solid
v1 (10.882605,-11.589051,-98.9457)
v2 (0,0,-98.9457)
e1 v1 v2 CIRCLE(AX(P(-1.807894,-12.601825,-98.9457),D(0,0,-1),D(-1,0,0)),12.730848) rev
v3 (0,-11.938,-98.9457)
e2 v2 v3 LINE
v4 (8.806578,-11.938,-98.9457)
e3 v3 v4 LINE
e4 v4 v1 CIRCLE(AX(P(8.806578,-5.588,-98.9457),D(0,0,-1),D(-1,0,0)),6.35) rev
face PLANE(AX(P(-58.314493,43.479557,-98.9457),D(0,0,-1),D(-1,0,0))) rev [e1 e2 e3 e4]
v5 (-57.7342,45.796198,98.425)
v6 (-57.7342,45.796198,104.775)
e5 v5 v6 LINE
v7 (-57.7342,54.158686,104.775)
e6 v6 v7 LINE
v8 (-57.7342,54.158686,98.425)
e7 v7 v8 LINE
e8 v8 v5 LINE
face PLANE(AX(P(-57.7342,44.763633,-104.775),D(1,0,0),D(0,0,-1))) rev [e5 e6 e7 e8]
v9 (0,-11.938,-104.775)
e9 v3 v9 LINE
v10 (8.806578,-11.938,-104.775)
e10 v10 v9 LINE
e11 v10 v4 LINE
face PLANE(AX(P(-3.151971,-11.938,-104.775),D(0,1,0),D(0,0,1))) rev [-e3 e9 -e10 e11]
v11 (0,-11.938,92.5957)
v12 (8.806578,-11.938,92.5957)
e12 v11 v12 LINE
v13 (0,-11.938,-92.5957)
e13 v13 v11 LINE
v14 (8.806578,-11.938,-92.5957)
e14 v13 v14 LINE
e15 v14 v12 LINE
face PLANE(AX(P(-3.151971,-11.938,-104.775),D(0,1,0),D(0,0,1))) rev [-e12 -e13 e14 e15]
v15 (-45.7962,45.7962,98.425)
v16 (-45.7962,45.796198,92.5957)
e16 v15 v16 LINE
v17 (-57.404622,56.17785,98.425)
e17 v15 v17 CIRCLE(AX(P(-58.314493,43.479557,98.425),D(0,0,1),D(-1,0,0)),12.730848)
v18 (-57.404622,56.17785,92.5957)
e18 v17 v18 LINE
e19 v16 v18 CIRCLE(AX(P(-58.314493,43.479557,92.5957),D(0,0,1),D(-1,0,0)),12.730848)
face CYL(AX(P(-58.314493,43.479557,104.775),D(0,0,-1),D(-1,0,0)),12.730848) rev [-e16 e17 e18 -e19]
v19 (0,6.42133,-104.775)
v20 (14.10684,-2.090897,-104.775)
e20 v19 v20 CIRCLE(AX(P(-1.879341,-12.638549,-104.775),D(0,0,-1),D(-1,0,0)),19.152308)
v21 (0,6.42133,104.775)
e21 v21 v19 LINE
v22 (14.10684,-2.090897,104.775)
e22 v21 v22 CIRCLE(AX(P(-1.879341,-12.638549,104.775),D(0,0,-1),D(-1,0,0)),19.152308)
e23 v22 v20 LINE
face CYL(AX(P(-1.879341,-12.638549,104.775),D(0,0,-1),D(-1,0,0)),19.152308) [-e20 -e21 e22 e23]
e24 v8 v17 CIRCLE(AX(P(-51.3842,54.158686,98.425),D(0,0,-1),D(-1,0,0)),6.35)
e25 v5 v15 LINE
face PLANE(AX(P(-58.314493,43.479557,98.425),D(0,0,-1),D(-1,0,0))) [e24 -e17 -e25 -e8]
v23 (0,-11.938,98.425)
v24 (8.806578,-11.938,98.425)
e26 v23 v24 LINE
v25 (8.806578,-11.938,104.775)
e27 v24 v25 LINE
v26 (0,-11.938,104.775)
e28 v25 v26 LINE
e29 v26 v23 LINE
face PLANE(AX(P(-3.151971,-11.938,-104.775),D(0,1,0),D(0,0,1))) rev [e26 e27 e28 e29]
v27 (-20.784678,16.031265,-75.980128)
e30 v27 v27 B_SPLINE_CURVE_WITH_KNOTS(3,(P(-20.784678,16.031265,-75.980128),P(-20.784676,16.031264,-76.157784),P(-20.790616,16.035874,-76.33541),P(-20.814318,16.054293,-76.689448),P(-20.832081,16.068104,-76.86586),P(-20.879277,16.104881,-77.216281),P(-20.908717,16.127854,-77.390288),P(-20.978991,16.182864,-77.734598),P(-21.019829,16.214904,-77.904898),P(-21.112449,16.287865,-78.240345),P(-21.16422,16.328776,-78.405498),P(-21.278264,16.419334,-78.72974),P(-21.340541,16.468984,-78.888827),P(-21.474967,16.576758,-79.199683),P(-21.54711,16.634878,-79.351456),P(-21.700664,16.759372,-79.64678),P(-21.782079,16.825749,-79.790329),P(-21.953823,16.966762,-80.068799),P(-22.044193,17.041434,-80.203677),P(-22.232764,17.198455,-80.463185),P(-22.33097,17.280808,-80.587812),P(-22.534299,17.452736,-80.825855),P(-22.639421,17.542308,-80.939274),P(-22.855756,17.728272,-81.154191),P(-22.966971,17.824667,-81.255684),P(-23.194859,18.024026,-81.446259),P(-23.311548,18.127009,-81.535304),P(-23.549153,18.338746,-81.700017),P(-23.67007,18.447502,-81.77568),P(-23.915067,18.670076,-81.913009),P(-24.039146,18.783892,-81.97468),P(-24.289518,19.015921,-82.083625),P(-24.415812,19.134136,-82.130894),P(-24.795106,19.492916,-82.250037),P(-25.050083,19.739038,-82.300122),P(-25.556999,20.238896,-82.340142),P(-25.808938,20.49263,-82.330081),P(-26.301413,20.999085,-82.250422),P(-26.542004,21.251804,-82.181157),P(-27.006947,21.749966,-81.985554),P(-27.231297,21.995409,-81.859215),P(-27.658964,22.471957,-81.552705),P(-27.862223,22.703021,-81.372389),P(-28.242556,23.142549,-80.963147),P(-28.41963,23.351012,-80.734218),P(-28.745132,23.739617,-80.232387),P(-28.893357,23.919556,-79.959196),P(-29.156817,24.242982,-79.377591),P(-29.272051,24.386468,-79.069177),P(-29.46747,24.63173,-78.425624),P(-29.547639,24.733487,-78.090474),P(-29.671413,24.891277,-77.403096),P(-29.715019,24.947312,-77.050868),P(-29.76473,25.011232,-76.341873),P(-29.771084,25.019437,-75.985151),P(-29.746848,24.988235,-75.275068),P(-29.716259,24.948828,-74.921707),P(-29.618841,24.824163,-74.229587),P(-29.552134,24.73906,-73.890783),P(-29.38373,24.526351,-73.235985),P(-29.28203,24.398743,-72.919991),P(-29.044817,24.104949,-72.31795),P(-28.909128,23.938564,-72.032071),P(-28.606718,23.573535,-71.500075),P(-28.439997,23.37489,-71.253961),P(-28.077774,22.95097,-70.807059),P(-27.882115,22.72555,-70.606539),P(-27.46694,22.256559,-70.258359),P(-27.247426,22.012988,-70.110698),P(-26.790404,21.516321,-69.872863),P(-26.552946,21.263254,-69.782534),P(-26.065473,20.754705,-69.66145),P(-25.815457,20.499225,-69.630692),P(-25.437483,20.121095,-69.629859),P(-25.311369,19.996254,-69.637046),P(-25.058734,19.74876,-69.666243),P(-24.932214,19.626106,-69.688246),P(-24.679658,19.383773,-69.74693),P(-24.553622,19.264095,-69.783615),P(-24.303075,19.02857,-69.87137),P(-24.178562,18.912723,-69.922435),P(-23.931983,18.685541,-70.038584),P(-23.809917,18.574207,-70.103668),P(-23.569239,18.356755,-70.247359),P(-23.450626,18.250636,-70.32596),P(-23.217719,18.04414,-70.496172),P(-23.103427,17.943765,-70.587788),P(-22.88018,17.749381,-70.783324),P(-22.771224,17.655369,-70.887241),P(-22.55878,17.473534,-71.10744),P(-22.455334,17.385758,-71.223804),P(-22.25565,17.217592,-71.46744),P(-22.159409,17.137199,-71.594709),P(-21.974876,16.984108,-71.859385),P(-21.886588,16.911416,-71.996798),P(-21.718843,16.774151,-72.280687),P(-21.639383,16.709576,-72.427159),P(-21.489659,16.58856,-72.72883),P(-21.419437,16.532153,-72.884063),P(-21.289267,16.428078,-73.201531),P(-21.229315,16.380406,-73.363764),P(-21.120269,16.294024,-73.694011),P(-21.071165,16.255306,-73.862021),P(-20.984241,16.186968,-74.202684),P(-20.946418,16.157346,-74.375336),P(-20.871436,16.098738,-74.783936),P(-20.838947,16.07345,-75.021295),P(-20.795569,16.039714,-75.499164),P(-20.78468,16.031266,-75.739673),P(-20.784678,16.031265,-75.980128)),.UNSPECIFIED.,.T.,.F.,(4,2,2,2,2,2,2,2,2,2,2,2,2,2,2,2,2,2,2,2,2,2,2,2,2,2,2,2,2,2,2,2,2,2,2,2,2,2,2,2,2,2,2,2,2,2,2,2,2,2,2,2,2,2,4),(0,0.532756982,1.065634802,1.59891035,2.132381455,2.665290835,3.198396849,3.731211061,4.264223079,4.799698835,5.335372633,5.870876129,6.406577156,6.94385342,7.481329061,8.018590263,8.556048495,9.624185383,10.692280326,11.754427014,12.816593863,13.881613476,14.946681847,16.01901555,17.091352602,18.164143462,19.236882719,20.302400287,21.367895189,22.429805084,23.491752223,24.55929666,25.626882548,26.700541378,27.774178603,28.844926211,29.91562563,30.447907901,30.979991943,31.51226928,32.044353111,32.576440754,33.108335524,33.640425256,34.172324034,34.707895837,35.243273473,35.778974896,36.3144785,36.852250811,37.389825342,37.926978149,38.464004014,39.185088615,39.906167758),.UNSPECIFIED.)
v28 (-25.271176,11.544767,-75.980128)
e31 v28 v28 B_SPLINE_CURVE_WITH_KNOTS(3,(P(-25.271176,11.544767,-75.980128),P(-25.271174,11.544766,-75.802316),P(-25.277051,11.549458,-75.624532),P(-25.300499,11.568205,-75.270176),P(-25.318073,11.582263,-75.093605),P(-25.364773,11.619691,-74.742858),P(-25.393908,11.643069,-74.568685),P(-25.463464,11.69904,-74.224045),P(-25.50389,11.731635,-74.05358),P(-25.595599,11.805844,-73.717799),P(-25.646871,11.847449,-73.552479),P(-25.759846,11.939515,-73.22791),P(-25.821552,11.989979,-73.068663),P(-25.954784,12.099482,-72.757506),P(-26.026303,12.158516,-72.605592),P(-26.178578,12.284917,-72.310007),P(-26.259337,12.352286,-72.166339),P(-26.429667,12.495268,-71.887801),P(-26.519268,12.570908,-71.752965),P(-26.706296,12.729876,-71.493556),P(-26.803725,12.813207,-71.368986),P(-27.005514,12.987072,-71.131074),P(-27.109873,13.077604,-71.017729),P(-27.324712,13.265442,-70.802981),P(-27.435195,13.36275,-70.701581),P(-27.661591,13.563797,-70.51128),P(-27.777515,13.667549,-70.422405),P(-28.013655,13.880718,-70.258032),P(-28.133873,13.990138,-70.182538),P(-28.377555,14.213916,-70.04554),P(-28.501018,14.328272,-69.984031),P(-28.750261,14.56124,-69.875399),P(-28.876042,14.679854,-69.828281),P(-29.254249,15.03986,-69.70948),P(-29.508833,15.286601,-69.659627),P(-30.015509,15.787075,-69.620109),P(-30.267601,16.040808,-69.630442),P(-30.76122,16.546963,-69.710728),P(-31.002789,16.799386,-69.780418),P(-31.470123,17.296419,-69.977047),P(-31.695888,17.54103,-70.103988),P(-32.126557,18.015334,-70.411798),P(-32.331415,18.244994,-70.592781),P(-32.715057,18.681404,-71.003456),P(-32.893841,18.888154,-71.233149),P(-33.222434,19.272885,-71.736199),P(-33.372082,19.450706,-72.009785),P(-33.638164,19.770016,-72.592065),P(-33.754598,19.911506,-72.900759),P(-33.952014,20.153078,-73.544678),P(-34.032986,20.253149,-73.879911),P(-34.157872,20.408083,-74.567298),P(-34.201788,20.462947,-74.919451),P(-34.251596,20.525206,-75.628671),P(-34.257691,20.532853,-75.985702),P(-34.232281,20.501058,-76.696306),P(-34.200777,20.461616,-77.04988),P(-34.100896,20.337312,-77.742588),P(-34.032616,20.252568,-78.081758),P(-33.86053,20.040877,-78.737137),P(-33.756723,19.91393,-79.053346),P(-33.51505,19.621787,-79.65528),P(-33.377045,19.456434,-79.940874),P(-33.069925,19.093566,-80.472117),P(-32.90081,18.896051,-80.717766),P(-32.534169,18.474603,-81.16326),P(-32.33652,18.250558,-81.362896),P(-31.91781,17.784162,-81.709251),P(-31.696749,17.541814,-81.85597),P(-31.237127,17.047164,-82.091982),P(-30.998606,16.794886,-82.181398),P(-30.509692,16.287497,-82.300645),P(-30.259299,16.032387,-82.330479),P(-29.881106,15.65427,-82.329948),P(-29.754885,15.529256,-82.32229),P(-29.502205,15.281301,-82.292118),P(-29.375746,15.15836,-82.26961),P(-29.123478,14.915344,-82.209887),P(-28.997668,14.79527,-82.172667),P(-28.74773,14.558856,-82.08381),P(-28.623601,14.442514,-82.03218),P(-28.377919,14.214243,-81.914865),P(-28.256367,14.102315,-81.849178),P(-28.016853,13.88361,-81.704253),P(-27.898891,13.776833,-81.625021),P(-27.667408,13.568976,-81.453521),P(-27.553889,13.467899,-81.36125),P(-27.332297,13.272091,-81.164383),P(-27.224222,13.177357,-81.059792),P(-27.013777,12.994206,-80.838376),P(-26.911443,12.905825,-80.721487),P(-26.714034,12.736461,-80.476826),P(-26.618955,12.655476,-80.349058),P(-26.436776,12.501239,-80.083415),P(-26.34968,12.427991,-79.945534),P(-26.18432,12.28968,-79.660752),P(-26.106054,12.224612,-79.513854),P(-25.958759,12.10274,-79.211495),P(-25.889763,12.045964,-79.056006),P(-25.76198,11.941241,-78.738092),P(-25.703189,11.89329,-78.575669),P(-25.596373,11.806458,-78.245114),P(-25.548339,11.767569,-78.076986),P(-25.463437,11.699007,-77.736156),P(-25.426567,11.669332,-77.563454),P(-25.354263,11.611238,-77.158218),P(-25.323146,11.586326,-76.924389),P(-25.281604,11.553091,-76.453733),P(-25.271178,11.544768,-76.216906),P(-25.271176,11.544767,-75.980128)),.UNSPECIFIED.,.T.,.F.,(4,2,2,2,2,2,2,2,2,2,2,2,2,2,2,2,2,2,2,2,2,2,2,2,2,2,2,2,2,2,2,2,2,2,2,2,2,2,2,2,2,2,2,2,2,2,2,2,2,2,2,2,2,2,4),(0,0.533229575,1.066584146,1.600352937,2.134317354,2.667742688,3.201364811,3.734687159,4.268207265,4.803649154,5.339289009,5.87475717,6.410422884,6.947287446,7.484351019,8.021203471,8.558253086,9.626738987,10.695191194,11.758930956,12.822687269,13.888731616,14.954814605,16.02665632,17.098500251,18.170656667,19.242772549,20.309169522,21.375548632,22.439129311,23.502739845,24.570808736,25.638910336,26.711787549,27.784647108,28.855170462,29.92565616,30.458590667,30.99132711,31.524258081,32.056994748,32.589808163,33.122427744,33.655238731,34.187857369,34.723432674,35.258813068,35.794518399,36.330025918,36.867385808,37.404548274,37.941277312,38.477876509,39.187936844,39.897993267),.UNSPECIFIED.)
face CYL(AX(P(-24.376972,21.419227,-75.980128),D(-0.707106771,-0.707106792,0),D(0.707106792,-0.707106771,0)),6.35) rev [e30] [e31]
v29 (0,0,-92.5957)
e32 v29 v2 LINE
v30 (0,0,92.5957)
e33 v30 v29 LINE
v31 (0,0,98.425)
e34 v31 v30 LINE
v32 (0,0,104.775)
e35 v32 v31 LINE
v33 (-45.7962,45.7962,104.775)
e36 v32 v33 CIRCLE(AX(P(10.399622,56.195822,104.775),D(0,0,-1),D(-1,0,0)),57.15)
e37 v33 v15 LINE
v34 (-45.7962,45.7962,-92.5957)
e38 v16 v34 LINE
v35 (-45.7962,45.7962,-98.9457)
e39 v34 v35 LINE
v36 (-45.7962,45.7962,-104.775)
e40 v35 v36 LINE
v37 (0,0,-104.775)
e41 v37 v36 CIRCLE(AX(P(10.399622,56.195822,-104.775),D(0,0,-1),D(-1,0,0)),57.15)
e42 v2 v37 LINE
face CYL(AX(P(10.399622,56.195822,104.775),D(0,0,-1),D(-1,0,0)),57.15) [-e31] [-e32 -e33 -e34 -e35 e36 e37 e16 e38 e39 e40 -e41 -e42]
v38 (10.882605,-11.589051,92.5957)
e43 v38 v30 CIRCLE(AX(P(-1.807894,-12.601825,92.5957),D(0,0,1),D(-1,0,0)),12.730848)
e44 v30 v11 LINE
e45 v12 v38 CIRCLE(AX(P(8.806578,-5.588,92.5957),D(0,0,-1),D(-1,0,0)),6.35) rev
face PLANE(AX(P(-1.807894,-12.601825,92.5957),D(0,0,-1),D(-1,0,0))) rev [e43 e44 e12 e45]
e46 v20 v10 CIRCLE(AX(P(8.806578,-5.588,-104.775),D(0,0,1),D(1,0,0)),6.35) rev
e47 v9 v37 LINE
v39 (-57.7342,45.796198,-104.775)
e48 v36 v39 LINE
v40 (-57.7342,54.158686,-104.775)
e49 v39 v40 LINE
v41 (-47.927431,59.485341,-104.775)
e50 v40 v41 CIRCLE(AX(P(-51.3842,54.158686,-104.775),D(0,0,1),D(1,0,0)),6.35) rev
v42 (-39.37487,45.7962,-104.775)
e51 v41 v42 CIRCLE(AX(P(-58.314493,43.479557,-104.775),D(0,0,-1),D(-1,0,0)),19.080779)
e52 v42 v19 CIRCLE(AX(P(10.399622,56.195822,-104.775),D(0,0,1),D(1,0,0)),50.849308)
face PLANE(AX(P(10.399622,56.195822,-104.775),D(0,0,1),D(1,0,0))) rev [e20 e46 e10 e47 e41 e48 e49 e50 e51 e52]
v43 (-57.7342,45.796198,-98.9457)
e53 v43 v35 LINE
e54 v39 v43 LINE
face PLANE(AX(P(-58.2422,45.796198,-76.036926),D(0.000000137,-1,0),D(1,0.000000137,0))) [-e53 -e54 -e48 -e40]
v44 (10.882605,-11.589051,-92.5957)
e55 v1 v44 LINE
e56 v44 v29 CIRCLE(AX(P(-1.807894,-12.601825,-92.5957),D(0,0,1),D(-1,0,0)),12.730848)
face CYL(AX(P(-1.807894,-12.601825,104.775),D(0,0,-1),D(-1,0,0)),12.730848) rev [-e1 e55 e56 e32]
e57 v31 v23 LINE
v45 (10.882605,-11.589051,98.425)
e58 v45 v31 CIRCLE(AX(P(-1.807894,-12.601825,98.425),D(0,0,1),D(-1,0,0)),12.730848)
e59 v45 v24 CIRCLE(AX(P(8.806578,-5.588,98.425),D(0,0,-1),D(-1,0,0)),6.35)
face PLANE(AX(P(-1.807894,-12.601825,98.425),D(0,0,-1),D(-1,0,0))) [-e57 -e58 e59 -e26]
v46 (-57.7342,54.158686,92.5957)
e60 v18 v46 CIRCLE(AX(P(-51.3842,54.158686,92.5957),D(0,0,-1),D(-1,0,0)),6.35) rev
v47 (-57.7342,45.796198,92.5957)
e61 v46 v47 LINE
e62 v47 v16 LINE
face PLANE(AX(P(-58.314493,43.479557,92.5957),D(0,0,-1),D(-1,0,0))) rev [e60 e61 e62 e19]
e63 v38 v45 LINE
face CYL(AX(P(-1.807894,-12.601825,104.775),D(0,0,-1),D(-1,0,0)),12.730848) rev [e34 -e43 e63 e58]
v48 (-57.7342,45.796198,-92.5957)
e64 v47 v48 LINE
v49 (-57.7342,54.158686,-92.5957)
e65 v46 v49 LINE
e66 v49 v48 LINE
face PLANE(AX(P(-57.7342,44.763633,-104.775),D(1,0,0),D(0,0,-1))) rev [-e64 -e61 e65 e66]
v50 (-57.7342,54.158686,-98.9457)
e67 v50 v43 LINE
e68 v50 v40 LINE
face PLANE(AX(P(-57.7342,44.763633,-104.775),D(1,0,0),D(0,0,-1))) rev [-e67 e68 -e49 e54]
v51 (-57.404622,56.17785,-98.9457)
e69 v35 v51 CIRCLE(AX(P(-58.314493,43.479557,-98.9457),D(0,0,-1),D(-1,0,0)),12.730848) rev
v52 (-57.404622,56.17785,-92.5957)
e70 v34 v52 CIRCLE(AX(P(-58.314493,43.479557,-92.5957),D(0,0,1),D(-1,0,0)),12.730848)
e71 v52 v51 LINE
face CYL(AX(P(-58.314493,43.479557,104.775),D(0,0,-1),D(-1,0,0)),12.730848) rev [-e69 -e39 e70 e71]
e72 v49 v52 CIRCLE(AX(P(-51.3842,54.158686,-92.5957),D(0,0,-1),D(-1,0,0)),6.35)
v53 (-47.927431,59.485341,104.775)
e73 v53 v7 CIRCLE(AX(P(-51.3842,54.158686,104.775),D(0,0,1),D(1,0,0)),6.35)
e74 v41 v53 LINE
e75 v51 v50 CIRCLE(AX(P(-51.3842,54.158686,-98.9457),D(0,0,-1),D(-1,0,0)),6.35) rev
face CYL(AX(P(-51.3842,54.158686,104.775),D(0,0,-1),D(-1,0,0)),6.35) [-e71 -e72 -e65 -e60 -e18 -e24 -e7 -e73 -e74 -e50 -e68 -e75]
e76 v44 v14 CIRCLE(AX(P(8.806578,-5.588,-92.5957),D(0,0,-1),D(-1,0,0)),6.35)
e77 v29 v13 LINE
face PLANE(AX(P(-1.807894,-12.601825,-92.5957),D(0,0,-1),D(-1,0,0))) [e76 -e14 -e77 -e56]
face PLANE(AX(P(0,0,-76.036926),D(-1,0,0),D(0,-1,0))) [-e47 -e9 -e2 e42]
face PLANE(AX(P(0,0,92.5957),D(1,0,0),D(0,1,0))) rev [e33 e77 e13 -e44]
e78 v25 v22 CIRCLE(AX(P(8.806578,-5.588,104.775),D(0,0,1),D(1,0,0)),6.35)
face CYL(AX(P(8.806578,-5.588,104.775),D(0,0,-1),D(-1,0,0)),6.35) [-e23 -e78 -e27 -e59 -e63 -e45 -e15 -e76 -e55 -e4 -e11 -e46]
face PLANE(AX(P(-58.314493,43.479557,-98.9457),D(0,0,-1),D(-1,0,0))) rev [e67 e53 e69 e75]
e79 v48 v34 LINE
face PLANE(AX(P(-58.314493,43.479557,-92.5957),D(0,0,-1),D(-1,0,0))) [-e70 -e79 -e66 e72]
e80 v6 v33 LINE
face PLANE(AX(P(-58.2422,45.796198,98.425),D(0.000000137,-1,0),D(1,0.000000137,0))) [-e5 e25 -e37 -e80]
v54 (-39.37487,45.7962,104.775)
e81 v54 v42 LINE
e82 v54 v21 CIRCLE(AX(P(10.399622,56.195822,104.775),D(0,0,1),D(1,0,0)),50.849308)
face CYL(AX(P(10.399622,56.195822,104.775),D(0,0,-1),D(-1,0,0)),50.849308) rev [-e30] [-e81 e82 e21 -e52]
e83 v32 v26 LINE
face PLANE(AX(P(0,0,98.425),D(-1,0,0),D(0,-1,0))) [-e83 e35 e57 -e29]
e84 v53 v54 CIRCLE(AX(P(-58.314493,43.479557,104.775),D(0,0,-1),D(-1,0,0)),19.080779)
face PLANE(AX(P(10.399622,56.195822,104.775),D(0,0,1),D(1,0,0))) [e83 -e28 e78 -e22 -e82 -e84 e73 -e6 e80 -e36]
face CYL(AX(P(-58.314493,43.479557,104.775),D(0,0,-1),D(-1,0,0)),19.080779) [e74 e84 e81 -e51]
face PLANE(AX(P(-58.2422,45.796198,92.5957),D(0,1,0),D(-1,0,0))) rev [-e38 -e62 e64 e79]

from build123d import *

# Parameters (mm, degrees)
BOSS_EXTRUDE1_DEPTH = 104.775
BOSS_EXTRUDE2_DEPTH = 92.5957
BOSS_EXTRUDE3_START = -5.8293
BOSS_EXTRUDE3_DEPTH = 5.8293
BOSS_EXTRUDE4_DEPTH = 6.35
SKETCH5_W           = 7.787485422
SKETCH5_H           = 19.833751934
SKETCH5_W_2         = 22.754058967
SKETCH5_H_2         = 3.407024872
CUT_EXTRUDE1_DEPTH  = 227.312030137
FILLET1_R           = 6.35
SKETCH6_R           = 6.35
CUT_EXTRUDE2_DEPTH  = 6.35


with BuildPart() as part:
    # Sketch1 → Boss-Extrude1 (new, symmetric)
    with BuildSketch(Plane.XY):
        with BuildLine():
            Line((-58.2422, 56.2102), (-58.2422, 62.5602))
            ThreePointArc((-58.2422, 62.5602), (-45.640852469, 57.743322347), (-39.3748699, 45.7962))
            ThreePointArc((-39.3748699, 45.7962), (-25.556268964, 20.239931036), (0, 6.4213301))
            ThreePointArc((0, 6.4213301), (12.247457496, 0.293755183), (17.272, -12.446))
            Line((17.272, -12.446), (10.922, -12.446))
            ThreePointArc((10.922, -12.446), (7.760938146, -4.204686933), (0, 0))
            ThreePointArc((0, 0), (-30.011530905, 15.784669095), (-45.7962, 45.7962))
            ThreePointArc((-45.7962, 45.7962), (-50.144819563, 53.243313205), (-58.2422, 56.2102))
        make_face()
    extrude(amount=BOSS_EXTRUDE1_DEPTH, both=True)


with BuildPart() as boss_extrude2_tool:
    # Sketch2 → Boss-Extrude2 (new, symmetric)
    with BuildSketch(Plane.XY):
        with BuildLine():
            Line((-58.2422, 56.2102), (-58.2422, 45.796198296))
            Line((-58.2422, 45.796198296), (-45.796199685, 45.796198296))
            ThreePointArc((-45.796199685, 45.796198296), (-50.144818899, 53.243312648), (-58.2422, 56.2102))
        make_face()
        with BuildLine():
            Line((0, 0), (0, -12.446))
            Line((0, -12.446), (10.922, -12.446))
            ThreePointArc((10.922, -12.446), (7.760938146, -4.204686933), (0, 0))
        make_face()
    extrude(amount=BOSS_EXTRUDE2_DEPTH, both=True)


with BuildPart() as part_1:
    add(part.part)


with BuildPart() as part_2:
    # Boss-Extrude2: joined with boss_extrude2_tool
    add(part_1.part.fuse(boss_extrude2_tool.part, tol=0.00001))

    # Sketch3 → Boss-Extrude3 (add)
    with BuildSketch(Plane(origin=(0, 0, -104.775), x_dir=(-1, 0, 0), z_dir=(0, 0, -1)).offset(BOSS_EXTRUDE3_START)):
        with BuildLine():
            Line((58.2422, 56.2102), (58.2422, 45.796198296))
            Line((58.2422, 45.796198296), (45.7962, 45.7962))
            ThreePointArc((45.7962, 45.7962), (50.144819563, 53.243313205), (58.2422, 56.2102))
        make_face()
        with BuildLine():
            Line((0, 0), (0, -12.446))
            Line((0, -12.446), (-10.922, -12.446))
            ThreePointArc((-10.922, -12.446), (-7.760938146, -4.204686933), (0, 0))
        make_face()
    extrude(amount=BOSS_EXTRUDE3_DEPTH)

    # Sketch4 → Boss-Extrude4 (add)
    with BuildSketch(Plane.XY.offset(104.775)):
        with BuildLine():
            Line((-58.2422, 56.2102), (-58.2422, 45.796198296))
            Line((-58.2422, 45.796198296), (-45.7962, 45.7962))
            ThreePointArc((-45.7962, 45.7962), (-50.144819563, 53.243313205), (-58.2422, 56.2102))
        make_face()
        with BuildLine():
            Line((0, 0), (0, -12.446))
            Line((0, -12.446), (10.922, -12.446))
            ThreePointArc((10.922, -12.446), (7.760938146, -4.204686933), (0, 0))
        make_face()
    extrude(amount=-BOSS_EXTRUDE4_DEPTH)

    # Sketch5 → Cut-Extrude1 (cut, through all)
    with BuildSketch(Plane.XY.offset(104.775)):
        with Locations((-61.627942711, 54.680509116)):
            Rectangle(SKETCH5_W, SKETCH5_H)
        with Locations((8.225058429, -13.641512436)):
            Rectangle(SKETCH5_W_2, SKETCH5_H_2)
    extrude(amount=-CUT_EXTRUDE1_DEPTH, mode=Mode.SUBTRACT)

    # Fillet1
    # the kernel refuses this fillet: 6.35 mm, written as the material it takes off along each edge
    with BuildSketch(Plane(origin=(17.260151367, -11.938, -130.624178653), x_dir=(-0.30497213299383213, 0.9523612749882223, 0), z_dir=(0, 0, 1))) as fillet1_piece_1:
        with BuildLine():
            CenterArc((8.625598356, 6.114282737), FILLET1_R, 162.243512631, 123.416753829)
            Line((2.57810426, 8.050855782), (0, 0))
            ThreePointArc((0, 0), (5.169835731, -0.710949564), (10.339671461, 0))
        make_face()
    extrude(amount=261.248357306, mode=Mode.SUBTRACT)
    with BuildSketch(Plane(origin=(-57.7342, 62.551510856, -130.462315531), x_dir=(0.9544368882494849, -0.29841284548196007, 0), z_dir=(0, 0, 1))) as fillet1_piece_2:
        with BuildLine():
            CenterArc((8.565200947, -6.11549994), FILLET1_R, 74.380472255, 122.981827606)
            Line((2.504526706, -8.010421509), (0, 0))
            ThreePointArc((0, 0), (5.137463106, 0.704636839), (10.274926212, 0))
        make_face()
    extrude(amount=260.924631062, mode=Mode.SUBTRACT)

    # Sketch6 → Cut-Extrude2 (cut, symmetric)
    with BuildSketch(Plane(origin=(-5.969, -5.969000176, 0), x_dir=(-0.7071067916239179, 0.7071067707491772, 0), z_dir=(-0.7071067707491772, -0.7071067916239179, 0))):
        with Locations(Location((32.382802858, 75.980128158, 0), (0, 0, 180))):
            Circle(SKETCH6_R)
    extrude(amount=CUT_EXTRUDE2_DEPTH, both=True, mode=Mode.SUBTRACT)


solid = part_2.part
